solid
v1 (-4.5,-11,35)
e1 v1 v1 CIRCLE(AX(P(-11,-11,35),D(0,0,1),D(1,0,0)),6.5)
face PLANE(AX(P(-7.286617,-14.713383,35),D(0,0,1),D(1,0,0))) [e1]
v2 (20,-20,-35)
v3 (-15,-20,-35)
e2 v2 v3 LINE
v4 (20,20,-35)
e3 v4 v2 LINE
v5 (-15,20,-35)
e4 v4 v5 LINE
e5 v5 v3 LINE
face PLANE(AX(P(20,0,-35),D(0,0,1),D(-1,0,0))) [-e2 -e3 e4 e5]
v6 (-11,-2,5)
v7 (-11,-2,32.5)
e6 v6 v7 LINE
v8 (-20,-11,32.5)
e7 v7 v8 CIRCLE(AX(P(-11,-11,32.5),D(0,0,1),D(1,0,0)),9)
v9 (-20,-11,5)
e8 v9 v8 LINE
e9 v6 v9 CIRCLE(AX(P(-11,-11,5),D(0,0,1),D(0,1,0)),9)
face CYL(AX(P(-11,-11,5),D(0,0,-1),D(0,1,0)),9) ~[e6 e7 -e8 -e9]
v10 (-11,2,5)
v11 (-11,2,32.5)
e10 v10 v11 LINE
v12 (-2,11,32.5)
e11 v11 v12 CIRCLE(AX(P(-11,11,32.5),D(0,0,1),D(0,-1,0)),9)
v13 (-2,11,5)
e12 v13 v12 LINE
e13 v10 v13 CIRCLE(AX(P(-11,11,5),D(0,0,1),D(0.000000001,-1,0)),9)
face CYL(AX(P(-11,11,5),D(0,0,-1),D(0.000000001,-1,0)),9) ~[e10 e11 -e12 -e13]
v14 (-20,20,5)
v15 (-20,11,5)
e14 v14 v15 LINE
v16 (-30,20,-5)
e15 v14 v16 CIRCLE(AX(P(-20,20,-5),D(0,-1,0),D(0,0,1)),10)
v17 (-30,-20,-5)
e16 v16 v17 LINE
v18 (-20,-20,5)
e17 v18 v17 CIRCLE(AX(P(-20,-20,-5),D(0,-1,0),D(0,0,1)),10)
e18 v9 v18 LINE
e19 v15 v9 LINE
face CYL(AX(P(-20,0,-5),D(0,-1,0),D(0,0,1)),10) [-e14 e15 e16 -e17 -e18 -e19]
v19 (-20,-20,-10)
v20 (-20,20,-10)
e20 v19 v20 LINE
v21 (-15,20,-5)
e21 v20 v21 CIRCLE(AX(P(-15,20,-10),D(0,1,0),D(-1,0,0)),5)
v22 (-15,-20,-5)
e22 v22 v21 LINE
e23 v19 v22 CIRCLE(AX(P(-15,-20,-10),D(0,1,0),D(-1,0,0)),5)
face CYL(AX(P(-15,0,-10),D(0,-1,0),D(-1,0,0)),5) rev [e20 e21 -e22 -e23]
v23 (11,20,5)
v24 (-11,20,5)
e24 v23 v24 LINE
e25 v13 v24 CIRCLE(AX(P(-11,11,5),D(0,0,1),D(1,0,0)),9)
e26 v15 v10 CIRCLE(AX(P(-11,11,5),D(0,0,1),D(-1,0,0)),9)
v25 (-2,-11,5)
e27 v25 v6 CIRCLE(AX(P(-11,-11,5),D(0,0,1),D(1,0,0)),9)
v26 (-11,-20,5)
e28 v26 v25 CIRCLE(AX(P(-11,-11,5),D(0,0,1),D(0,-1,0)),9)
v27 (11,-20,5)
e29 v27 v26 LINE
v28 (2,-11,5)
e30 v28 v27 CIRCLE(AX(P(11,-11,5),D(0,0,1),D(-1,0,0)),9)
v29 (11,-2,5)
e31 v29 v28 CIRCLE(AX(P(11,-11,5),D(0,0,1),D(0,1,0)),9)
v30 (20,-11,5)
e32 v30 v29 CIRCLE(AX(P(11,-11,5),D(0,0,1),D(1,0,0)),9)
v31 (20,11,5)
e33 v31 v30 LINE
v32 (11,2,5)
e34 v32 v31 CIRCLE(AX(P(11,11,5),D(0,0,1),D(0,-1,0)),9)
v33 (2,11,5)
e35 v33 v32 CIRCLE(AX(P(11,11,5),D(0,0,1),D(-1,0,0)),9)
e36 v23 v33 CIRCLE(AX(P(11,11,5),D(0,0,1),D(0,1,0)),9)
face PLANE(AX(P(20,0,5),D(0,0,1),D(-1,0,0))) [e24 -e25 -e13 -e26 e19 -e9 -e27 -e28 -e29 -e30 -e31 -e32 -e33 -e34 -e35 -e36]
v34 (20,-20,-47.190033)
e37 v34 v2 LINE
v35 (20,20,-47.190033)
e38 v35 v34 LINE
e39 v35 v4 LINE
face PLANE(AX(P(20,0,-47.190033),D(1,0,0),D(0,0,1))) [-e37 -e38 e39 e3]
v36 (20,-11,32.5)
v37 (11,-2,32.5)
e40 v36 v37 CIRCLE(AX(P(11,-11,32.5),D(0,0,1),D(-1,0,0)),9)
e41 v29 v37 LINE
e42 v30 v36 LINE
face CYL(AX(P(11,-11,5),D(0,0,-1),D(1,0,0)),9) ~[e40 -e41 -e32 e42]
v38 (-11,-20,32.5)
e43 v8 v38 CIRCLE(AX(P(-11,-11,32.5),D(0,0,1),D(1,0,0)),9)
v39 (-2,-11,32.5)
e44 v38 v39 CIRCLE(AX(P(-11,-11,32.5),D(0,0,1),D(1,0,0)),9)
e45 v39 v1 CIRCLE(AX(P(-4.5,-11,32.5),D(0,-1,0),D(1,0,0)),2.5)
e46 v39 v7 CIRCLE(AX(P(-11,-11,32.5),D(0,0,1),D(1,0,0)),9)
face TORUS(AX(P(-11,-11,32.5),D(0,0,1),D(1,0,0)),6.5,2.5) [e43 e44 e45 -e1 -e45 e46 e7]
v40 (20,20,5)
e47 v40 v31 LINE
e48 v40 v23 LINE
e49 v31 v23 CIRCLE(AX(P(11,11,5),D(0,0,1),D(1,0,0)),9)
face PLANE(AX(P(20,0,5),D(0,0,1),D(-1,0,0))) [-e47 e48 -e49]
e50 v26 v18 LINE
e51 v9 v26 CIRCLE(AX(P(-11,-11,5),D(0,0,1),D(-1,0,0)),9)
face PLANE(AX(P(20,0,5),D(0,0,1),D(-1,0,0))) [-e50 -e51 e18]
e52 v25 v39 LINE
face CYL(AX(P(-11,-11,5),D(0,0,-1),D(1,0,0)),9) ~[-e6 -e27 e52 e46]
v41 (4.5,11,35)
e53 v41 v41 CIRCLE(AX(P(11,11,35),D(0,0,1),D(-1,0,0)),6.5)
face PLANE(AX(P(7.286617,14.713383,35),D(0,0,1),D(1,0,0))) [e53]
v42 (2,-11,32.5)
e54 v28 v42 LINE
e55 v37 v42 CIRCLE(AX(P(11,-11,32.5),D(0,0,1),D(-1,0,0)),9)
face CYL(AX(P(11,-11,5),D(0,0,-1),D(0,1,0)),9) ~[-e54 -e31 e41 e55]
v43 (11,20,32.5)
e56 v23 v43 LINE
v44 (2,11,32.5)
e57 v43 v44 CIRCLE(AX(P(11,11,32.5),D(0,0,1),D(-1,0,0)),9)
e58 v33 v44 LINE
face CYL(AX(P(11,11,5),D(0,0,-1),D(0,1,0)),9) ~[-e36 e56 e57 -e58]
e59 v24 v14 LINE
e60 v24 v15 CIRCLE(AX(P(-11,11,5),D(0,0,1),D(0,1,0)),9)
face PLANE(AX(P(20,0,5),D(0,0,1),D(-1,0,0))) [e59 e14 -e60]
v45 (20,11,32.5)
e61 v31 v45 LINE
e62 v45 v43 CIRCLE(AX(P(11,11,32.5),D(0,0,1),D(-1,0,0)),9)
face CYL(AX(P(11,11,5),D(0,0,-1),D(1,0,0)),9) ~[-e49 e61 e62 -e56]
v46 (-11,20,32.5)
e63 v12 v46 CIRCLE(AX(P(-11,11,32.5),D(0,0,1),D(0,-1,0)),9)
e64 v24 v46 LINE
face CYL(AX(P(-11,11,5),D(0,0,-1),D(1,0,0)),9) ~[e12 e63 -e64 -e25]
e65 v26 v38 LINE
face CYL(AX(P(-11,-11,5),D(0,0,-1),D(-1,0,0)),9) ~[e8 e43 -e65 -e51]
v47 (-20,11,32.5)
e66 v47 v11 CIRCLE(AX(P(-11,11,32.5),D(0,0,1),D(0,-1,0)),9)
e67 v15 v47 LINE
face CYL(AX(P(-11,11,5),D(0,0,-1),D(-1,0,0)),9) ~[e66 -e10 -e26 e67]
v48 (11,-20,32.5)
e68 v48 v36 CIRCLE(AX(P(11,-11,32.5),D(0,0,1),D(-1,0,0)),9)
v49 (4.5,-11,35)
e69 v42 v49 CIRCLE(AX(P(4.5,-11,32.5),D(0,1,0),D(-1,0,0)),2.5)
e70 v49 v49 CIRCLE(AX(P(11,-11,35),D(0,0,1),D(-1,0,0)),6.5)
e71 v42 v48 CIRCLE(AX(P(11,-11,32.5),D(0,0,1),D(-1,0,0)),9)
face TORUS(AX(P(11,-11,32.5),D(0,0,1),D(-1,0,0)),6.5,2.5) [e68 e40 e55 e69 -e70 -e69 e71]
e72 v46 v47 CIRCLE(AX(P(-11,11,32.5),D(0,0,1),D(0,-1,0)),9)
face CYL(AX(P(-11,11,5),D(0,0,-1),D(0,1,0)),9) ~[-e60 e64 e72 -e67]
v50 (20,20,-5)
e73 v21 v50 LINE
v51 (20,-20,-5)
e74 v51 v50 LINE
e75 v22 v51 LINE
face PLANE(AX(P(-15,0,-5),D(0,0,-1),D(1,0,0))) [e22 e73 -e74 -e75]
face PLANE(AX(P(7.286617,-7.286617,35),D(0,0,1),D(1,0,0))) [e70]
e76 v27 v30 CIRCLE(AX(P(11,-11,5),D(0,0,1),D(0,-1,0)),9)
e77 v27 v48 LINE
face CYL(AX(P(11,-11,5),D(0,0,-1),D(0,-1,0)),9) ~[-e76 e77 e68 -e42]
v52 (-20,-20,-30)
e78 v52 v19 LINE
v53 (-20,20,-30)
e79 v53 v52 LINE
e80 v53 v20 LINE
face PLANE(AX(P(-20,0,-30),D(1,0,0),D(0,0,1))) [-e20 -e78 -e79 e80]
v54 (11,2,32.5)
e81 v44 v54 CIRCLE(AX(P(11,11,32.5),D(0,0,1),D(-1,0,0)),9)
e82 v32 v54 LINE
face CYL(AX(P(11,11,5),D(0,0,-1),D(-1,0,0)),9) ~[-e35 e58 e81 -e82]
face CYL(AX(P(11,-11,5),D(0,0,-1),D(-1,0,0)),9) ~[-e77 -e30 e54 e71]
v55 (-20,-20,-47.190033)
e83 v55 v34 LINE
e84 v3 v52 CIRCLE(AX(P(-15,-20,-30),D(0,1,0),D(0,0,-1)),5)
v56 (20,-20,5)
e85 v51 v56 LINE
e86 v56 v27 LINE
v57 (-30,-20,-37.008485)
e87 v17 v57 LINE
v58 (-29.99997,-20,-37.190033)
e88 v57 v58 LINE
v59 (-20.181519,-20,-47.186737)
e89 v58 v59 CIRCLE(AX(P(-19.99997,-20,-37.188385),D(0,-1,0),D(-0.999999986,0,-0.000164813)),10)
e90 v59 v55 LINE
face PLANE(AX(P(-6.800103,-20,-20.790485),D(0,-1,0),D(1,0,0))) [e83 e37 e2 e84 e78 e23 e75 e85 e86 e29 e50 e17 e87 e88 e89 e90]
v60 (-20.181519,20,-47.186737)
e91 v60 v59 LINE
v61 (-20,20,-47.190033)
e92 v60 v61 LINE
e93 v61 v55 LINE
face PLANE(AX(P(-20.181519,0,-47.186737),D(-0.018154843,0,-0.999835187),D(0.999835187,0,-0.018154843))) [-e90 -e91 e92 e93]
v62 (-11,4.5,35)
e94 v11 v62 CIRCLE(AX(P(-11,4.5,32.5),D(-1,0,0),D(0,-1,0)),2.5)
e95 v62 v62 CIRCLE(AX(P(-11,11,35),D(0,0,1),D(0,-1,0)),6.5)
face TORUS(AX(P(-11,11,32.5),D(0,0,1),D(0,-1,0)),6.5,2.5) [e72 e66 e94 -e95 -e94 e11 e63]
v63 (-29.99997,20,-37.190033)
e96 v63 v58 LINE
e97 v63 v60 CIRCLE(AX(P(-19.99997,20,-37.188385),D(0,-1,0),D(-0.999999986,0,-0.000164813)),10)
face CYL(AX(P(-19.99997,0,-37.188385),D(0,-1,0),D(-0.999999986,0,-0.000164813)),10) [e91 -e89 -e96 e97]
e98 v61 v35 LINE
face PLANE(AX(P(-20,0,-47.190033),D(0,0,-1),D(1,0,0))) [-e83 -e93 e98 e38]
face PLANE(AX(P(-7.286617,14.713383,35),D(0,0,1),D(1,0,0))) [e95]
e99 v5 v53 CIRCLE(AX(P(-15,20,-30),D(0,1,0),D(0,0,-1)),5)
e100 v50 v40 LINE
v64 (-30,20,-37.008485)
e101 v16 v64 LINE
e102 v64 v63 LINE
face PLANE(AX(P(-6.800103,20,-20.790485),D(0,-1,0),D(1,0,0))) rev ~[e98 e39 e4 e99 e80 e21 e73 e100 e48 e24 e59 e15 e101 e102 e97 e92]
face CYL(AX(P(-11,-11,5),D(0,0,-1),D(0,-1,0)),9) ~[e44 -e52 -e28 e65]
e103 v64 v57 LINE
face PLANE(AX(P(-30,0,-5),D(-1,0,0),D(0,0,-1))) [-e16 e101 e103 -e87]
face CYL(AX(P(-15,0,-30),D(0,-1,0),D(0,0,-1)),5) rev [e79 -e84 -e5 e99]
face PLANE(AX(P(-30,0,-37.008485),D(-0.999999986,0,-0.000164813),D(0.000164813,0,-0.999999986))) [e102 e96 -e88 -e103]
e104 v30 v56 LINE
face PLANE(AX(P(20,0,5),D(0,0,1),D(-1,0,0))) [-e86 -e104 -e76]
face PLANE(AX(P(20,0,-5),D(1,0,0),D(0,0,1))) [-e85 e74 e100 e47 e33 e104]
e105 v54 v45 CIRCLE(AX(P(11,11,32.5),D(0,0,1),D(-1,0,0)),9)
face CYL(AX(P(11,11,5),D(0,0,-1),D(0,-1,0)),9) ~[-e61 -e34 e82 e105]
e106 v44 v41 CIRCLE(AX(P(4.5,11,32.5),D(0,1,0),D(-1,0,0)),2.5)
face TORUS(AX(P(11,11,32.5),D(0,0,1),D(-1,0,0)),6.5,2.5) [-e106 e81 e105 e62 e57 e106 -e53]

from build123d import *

# Parameters (mm, degrees)
F1_DEPTH = 20
F3_DEPTH = 30


# Not quite as in the source:
# - a fillet or chamfer that OpenCascade refuses, or shapes differently, is made with other operations: its cross-section is extruded or revolved along the edge and cut away or added
# - a feature names something its author has since deleted; it is built from what else it names


with BuildPart() as f1:
    # F0 (on Front) → F1 (new body, symmetric)
    with BuildSketch(Plane.XZ):
        with BuildLine():
            Line((-10, -5), (20, -5))
            Line((20, -5), (20, 5))
            Line((20, 5), (-20, 5))
            ThreePointArc((-20, 5), (-27.0710678119, 2.0710678119), (-30, -5))
            Line((-30, -5), (-30, -37.0084848255))
            Line((-30, -37.0084848255), (-29.9999700785, -37.1900333921))
            ThreePointArc((-29.9999700785, -37.1900333921), (-27.134358967, -44.1955599538), (-20.1815186475, -47.1867371371))
            Line((-20.1815186475, -47.1867371371), (-20, -47.1900331229))
            Line((-20, -47.1900331229), (20, -47.1900331229))
            Line((20, -47.1900331229), (20, -35))
            Line((20, -35), (-15, -35))
            ThreePointArc((-15, -35), (-18.5355339059, -33.5355339059), (-20, -30))
            Line((-20, -30), (-20, -15))
            Line((-20, -15), (-20, -10))
            ThreePointArc((-20, -10), (-18.5355339059, -6.4644660941), (-15, -5))
            Line((-15, -5), (-10, -5))
        make_face()
    extrude(amount=F1_DEPTH, both=True)

    # F2 (on face) → F3 (join)
    with BuildSketch(Plane.XY.offset(5)):
        with BuildLine():
            Line((-11, 11), (-2, 11))
            ThreePointArc((-2, 11), (-4.6360389693, 17.3639610307), (-11, 20))
            Line((-11, 20), (-11, 11))
        make_face()
        with BuildLine():
            Line((-20, 11), (-11, 11))
            Line((-11, 11), (-11, 20))
            ThreePointArc((-11, 20), (-17.3639610307, 17.3639610307), (-20, 11))
        make_face()
        with BuildLine():
            ThreePointArc((-20, 11), (-17.3639610288, 4.6360389675), (-10.9999999948, 2))
            Line((-11, 2), (-11, 11))
            Line((-11, 11), (-20, 11))
        make_face()
        with BuildLine():
            Line((-11, 11), (-11, 2))
            ThreePointArc((-10.9999999948, 2), (-4.6360389675, 4.6360389712), (-2, 11))
            Line((-2, 11), (-11, 11))
        make_face()
        with BuildLine():
            ThreePointArc((11, 20), (4.6360389693, 17.3639610307), (2, 11))
            Line((2, 11), (11, 11))
            Line((11, 11), (11, 20))
        make_face()
        with BuildLine():
            Line((11, 20), (11, 11))
            Line((11, 11), (20, 11))
            ThreePointArc((20, 11), (17.3639610307, 17.3639610307), (11, 20))
        make_face()
        with BuildLine():
            Line((11, 11), (11, 2))
            ThreePointArc((11, 2), (17.3639610307, 4.6360389693), (20, 11))
            Line((20, 11), (11, 11))
        make_face()
        with BuildLine():
            ThreePointArc((2, 11), (4.6360389693, 4.6360389693), (11, 2))
            Line((11, 2), (11, 11))
            Line((11, 11), (2, 11))
        make_face()
        with BuildLine():
            ThreePointArc((11, -2), (4.6360389693, -4.6360389693), (2, -11))
            Line((2, -11), (11, -11))
            Line((11, -11), (11, -2))
        make_face()
        with BuildLine():
            Line((11, -2), (11, -11))
            Line((11, -11), (20, -11))
            ThreePointArc((20, -11), (17.3639610307, -4.6360389693), (11, -2))
        make_face()
        with BuildLine():
            Line((11, -11), (11, -20))
            ThreePointArc((11, -20), (17.3639610307, -17.3639610307), (20, -11))
            Line((20, -11), (11, -11))
        make_face()
        with BuildLine():
            Line((11, -11), (2, -11))
            ThreePointArc((2, -11), (4.6360389693, -17.3639610307), (11, -20))
            Line((11, -20), (11, -11))
        make_face()
        with BuildLine():
            ThreePointArc((-11, -20), (-4.6360389693, -17.3639610307), (-2, -11))
            Line((-2, -11), (-11, -11))
            Line((-11, -11), (-11, -20))
        make_face()
        with BuildLine():
            ThreePointArc((-20, -11), (-17.3639610307, -17.3639610307), (-11, -20))
            Line((-11, -20), (-11, -11))
            Line((-11, -11), (-20, -11))
        make_face()
        with BuildLine():
            Line((-20, -11), (-11, -11))
            Line((-11, -11), (-11, -2))
            ThreePointArc((-11, -2), (-17.3639610307, -4.6360389693), (-20, -11))
        make_face()
        with BuildLine():
            Line((-11, -11), (-2, -11))
            ThreePointArc((-2, -11), (-4.6360389693, -4.6360389693), (-11, -2))
            Line((-11, -2), (-11, -11))
        make_face()
    extrude(amount=F3_DEPTH)

    # F4: fillet of radius 2.5 on 4 edges, made by hand

    # F4_s1 → F4_t2 (revolve, cut)
    with BuildSketch(Plane.YZ.offset(-11)):
        with BuildLine():
            ThreePointArc((2, 32.5), (2.732233047, 34.267766953), (4.5, 35))
            Line((4.5, 35), (2, 35))
            Line((2, 35), (2, 32.5))
        make_face()
    revolve(axis=Axis((-11, 11, 35), (0, 0, 1)), mode=Mode.SUBTRACT)

    # F4_s3 → F4_t4 (revolve, cut)
    with BuildSketch(Plane.XZ.offset(-11)):
        with BuildLine():
            ThreePointArc((2, 32.5), (2.732233047, 34.267766953), (4.5, 35))
            Line((4.5, 35), (2, 35))
            Line((2, 35), (2, 32.5))
        make_face()
    revolve(axis=Axis((11, 11, 35), (0, 0, 1)), mode=Mode.SUBTRACT)

    # F4_s5 → F4_t6 (revolve, cut)
    with BuildSketch(Plane.XZ.offset(11)):
        with BuildLine():
            ThreePointArc((2, 32.5), (2.732233047, 34.267766953), (4.5, 35))
            Line((4.5, 35), (2, 35))
            Line((2, 35), (2, 32.5))
        make_face()
    revolve(axis=Axis((11, -11, 35), (0, 0, 1)), mode=Mode.SUBTRACT)

    # F4_s7 → F4_t8 (revolve, cut)
    with BuildSketch(Plane.XZ.offset(11)):
        with BuildLine():
            ThreePointArc((-2, 32.5), (-2.732233047, 34.267766953), (-4.5, 35))
            Line((-4.5, 35), (-2, 35))
            Line((-2, 35), (-2, 32.5))
        make_face()
    revolve(axis=Axis((-11, -11, 35), (0, 0, 1)), mode=Mode.SUBTRACT)


solid = f1.part
